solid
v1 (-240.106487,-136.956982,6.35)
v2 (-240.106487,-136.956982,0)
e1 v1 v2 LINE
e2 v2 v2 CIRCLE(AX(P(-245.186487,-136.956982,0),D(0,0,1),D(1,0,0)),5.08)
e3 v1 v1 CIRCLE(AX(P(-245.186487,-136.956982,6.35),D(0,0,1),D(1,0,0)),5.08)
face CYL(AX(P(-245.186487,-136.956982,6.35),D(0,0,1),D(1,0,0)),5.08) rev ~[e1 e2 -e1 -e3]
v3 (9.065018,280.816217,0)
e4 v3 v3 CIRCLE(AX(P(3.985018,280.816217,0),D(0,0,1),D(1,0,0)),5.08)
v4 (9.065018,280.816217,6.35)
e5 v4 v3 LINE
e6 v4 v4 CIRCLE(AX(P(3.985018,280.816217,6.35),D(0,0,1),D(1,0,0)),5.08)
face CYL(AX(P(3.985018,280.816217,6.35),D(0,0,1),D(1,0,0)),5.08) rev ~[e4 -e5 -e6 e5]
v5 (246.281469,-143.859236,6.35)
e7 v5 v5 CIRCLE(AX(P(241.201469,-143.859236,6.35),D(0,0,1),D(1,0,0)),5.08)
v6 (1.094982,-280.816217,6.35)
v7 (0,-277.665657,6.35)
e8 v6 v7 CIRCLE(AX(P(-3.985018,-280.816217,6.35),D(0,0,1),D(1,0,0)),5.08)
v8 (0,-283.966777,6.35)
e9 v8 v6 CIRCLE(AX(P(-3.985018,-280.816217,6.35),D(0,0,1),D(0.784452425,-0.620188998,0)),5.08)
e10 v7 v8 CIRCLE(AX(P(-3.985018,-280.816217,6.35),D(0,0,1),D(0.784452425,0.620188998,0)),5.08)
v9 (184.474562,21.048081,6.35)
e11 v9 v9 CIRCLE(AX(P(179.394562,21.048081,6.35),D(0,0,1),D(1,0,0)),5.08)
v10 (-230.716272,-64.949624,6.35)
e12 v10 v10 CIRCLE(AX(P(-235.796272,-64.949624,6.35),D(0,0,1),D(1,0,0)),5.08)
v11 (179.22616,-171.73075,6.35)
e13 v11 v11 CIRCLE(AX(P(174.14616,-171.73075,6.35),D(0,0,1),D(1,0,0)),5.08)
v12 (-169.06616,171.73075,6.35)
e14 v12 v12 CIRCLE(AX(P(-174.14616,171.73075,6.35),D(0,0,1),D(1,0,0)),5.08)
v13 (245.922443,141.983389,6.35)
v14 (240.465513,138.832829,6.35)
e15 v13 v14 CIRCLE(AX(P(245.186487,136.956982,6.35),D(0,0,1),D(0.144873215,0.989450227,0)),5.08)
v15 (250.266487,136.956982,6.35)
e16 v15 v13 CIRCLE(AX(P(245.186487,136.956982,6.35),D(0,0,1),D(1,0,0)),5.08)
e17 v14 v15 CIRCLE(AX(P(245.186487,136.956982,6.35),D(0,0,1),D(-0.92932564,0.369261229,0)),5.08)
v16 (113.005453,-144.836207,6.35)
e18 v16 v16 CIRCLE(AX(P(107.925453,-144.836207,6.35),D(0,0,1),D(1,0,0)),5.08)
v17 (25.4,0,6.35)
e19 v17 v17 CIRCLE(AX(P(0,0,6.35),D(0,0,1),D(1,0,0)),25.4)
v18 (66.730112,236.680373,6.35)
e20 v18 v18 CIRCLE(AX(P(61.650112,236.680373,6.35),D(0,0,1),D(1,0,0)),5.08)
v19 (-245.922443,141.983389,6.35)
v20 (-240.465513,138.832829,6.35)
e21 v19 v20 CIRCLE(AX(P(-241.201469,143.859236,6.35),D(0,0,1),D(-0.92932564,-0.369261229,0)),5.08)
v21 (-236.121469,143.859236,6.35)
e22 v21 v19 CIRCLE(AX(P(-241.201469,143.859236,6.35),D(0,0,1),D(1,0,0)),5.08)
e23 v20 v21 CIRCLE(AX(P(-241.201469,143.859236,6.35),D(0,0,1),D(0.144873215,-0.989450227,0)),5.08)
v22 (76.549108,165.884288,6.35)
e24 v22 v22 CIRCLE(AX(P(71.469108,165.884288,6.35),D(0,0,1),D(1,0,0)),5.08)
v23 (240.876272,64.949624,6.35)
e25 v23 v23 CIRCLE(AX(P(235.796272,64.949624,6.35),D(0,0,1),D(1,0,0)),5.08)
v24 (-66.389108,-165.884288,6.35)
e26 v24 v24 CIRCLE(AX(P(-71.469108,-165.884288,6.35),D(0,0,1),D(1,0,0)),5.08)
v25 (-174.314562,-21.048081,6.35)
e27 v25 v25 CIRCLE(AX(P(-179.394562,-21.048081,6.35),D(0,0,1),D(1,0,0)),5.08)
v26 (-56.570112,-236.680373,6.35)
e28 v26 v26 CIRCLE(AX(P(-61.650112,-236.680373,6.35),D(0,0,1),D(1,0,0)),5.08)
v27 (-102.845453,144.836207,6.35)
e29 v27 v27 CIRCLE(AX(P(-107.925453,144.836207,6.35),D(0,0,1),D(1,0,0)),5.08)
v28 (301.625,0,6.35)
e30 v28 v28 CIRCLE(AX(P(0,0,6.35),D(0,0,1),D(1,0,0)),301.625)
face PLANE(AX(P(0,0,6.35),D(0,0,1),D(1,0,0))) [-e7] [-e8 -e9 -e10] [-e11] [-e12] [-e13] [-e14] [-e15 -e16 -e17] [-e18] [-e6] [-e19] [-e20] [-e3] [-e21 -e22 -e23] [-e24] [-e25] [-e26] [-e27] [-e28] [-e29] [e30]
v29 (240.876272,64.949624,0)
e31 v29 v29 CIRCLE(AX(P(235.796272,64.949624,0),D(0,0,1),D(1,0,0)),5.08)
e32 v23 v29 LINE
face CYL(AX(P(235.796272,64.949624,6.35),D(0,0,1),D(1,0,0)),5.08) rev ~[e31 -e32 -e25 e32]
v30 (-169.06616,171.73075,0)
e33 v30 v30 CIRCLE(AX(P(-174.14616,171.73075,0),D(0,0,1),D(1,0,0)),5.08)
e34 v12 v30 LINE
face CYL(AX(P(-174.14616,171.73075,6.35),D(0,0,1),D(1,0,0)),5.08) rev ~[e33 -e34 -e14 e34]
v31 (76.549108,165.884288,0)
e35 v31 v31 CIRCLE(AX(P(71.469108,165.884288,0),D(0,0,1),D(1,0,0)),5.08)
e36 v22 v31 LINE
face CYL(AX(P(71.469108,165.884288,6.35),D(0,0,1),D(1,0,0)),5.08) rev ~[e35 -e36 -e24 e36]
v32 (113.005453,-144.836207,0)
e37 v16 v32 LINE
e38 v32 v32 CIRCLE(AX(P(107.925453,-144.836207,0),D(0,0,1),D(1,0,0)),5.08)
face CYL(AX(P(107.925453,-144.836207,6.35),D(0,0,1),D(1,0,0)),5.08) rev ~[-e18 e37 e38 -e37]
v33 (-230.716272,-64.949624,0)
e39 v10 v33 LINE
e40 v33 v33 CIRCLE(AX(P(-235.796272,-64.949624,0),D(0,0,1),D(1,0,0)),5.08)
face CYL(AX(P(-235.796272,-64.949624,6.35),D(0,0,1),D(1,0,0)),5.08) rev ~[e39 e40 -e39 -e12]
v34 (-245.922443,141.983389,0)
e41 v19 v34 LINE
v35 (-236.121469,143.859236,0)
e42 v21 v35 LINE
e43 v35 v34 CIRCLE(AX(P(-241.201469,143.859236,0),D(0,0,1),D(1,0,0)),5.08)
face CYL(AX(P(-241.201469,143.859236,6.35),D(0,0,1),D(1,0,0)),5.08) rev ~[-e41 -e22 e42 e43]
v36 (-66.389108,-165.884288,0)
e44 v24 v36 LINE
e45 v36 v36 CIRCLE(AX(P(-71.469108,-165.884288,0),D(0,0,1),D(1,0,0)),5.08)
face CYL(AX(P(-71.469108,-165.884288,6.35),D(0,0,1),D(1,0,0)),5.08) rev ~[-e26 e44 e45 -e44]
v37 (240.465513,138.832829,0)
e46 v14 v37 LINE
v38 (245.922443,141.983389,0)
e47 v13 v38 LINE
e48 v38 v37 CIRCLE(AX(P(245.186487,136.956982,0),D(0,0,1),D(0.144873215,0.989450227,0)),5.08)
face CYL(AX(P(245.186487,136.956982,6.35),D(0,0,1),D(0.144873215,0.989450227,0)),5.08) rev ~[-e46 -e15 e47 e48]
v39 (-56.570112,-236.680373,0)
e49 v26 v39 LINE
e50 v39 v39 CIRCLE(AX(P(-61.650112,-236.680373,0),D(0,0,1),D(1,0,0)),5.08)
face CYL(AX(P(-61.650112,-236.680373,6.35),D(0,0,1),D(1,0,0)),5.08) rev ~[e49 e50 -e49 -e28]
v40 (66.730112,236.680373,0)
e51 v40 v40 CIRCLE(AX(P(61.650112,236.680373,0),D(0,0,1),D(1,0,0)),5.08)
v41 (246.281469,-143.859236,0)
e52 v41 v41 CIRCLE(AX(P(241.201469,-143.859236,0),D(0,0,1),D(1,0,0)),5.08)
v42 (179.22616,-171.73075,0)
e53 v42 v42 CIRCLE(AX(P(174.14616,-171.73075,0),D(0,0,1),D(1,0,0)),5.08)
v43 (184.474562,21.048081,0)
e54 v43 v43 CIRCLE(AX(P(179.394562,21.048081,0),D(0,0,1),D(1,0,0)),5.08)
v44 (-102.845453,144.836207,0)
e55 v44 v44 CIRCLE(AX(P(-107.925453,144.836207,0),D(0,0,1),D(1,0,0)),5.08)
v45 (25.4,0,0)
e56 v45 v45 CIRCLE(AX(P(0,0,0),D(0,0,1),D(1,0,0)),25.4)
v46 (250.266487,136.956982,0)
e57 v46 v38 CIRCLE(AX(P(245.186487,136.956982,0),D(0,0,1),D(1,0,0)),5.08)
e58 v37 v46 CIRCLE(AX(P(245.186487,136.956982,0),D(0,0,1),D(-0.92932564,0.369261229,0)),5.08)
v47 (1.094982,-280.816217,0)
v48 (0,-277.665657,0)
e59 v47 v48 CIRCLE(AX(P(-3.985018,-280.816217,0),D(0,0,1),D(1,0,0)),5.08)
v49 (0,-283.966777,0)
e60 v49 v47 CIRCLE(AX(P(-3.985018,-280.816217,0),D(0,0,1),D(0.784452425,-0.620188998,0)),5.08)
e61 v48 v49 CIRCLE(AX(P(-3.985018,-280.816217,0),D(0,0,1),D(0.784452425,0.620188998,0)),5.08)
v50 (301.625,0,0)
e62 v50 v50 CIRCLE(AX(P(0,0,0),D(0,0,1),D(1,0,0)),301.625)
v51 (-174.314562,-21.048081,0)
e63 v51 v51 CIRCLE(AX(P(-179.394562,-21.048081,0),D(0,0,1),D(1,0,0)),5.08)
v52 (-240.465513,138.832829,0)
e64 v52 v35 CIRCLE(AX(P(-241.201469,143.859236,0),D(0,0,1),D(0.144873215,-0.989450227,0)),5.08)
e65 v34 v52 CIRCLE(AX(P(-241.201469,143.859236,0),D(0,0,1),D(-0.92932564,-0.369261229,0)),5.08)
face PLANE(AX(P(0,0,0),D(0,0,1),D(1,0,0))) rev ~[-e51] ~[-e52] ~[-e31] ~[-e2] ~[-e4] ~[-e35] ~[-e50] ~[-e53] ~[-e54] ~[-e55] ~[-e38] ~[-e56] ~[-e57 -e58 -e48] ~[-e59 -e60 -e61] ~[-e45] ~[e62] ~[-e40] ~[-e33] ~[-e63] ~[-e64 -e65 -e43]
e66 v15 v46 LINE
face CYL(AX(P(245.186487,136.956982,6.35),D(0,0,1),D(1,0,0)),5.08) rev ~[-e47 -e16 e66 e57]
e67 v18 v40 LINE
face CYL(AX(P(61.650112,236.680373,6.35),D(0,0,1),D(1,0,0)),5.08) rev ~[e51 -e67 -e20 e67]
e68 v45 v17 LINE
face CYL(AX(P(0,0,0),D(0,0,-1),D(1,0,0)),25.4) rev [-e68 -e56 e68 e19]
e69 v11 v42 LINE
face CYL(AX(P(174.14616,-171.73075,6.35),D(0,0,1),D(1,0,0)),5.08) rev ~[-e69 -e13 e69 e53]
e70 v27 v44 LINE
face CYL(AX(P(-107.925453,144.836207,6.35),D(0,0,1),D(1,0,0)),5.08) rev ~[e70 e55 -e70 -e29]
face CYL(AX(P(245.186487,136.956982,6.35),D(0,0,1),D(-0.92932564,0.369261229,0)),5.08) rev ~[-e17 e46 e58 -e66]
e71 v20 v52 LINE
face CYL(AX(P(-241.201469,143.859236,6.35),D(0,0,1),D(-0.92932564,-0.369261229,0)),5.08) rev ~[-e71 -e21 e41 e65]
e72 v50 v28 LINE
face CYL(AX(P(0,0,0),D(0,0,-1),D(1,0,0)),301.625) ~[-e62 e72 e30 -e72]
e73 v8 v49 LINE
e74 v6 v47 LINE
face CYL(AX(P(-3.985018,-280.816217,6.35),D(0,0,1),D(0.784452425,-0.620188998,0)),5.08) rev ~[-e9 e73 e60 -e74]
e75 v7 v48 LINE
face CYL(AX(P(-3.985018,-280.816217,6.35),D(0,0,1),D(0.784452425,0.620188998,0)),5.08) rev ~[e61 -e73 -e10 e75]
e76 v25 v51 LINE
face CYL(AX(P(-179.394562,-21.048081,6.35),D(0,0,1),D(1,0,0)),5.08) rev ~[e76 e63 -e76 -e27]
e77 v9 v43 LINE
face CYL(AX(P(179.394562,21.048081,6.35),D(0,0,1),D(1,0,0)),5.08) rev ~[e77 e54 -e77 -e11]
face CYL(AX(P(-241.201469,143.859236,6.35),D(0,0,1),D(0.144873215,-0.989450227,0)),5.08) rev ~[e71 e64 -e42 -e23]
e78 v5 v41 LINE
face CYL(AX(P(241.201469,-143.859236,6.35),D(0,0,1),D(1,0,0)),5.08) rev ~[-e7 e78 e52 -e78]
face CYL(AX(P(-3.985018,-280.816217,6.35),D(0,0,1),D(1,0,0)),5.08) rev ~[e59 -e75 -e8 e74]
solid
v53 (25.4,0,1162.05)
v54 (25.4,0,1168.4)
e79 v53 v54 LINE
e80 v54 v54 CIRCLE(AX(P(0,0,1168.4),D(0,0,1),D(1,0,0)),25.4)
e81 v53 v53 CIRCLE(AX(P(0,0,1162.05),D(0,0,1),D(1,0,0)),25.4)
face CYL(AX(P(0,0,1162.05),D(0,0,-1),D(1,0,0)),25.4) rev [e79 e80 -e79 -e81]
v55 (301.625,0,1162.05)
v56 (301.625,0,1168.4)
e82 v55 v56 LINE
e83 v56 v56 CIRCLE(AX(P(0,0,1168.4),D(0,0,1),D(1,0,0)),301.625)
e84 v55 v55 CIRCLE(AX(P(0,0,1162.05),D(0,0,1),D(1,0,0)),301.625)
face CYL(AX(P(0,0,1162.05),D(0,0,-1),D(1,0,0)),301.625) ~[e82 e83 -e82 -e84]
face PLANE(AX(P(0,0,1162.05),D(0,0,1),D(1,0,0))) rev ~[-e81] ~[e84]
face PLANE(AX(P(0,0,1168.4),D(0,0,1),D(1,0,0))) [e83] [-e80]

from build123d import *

# Parameters (mm, degrees)
F0_R     = 301.625
F0_R_2   = 25.4
F1_DEPTH = 6.35
F5_R     = 301.625
F5_R_2   = 25.4
F7_DEPTH = 6.35
F6_R     = 5.08
F8_DEPTH = 6.351


# Not quite as in the source:
# - the program builds the solid bodies; features that only make, move or delete a surface that nothing else refers to are left out


with BuildPart() as f1:
    # F0 (on Top) → F1 (new body)
    with BuildSketch(Plane.XY):
        Circle(F0_R)
        Circle(F0_R_2, mode=Mode.SUBTRACT)
    extrude(amount=F1_DEPTH)

    # F6 (on face) → F8 (cut, through all)
    with BuildSketch(Plane.XY.offset(6.35)):
        with BuildLine():
            Line((-240.46551283, 138.8328285632), (-245.9224430153, 141.9833886746))
            ThreePointArc((-245.9224430153, 141.9833886746), (-243.7414687643, 139.4598266645), (-240.46551283, 138.8328285632))
        make_face()
        with BuildLine():
            ThreePointArc((-236.1214687643, 143.8592357157), (-242.1564166176, 148.8486720163), (-245.9224430153, 141.9833886746))
            Line((-245.9224430153, 141.9833886746), (-240.46551283, 138.8328285632))
            ThreePointArc((-240.46551283, 138.8328285632), (-237.3579641041, 140.5375084652), (-236.1214687643, 143.8592357157))
        make_face()
        with Locations((-174.1461598977, 171.7307498537)):
            Circle(F6_R)
        with Locations((-107.9254532481, 144.8362073709)):
            Circle(F6_R)
        with Locations((-245.186487081, -136.9569815221)):
            Circle(F6_R)
        with Locations((-235.7962719331, -64.949623516)):
            Circle(F6_R)
        with Locations((-179.394561595, -21.0480805423)):
            Circle(F6_R)
        with BuildLine():
            ThreePointArc((0, -277.6656571265), (-9.0650183167, -280.8162172379), (0, -283.9667773493))
            Line((0, -283.9667773493), (0, -277.6656571265))
        make_face()
        with BuildLine():
            Line((0, -277.6656571265), (0, -283.9667773493))
            ThreePointArc((0, -283.9667773493), (0.8134341968, -282.4839262879), (1.0949816833, -280.8162172379))
            ThreePointArc((1.0949816833, -280.8162172379), (0.8134341968, -279.1485081878), (0, -277.6656571265))
        make_face()
        with Locations((-61.6501120354, -236.6803733697)):
            Circle(F6_R)
        with Locations((-71.469108347, -165.8842879132)):
            Circle(F6_R)
        with Locations((107.9254532481, -144.8362073709)):
            Circle(F6_R)
        with Locations((174.1461598977, -171.7307498537)):
            Circle(F6_R)
        with Locations((241.2014687643, -143.8592357157)):
            Circle(F6_R)
        with Locations((179.394561595, 21.0480805423)):
            Circle(F6_R)
        with Locations((235.7962719331, 64.949623516)):
            Circle(F6_R)
        with BuildLine():
            Line((240.46551283, 138.8328285632), (245.9224430153, 141.9833886746))
            ThreePointArc((245.9224430153, 141.9833886746), (242.646487081, 141.3563905734), (240.46551283, 138.8328285632))
        make_face()
        with BuildLine():
            ThreePointArc((250.266487081, 136.9569815221), (249.0299917412, 140.2787087727), (245.9224430153, 141.9833886746))
            Line((245.9224430153, 141.9833886746), (240.46551283, 138.8328285632))
            ThreePointArc((240.46551283, 138.8328285632), (244.2315392277, 131.9675452216), (250.266487081, 136.9569815221))
        make_face()
        with Locations((71.469108347, 165.8842879132)):
            Circle(F6_R)
        with Locations((61.6501120354, 236.6803733697)):
            Circle(F6_R)
        with Locations((3.9850183167, 280.8162172379)):
            Circle(F6_R)
    extrude(amount=-F8_DEPTH, mode=Mode.SUBTRACT)


with BuildPart() as f7:
    # F5 (on offset) → F7 (new body)
    with BuildSketch(Plane.XY.offset(1162.05)):
        Circle(F5_R)
        Circle(F5_R_2, mode=Mode.SUBTRACT)
    extrude(amount=F7_DEPTH)


solid = Compound([f1.part, f7.part])
